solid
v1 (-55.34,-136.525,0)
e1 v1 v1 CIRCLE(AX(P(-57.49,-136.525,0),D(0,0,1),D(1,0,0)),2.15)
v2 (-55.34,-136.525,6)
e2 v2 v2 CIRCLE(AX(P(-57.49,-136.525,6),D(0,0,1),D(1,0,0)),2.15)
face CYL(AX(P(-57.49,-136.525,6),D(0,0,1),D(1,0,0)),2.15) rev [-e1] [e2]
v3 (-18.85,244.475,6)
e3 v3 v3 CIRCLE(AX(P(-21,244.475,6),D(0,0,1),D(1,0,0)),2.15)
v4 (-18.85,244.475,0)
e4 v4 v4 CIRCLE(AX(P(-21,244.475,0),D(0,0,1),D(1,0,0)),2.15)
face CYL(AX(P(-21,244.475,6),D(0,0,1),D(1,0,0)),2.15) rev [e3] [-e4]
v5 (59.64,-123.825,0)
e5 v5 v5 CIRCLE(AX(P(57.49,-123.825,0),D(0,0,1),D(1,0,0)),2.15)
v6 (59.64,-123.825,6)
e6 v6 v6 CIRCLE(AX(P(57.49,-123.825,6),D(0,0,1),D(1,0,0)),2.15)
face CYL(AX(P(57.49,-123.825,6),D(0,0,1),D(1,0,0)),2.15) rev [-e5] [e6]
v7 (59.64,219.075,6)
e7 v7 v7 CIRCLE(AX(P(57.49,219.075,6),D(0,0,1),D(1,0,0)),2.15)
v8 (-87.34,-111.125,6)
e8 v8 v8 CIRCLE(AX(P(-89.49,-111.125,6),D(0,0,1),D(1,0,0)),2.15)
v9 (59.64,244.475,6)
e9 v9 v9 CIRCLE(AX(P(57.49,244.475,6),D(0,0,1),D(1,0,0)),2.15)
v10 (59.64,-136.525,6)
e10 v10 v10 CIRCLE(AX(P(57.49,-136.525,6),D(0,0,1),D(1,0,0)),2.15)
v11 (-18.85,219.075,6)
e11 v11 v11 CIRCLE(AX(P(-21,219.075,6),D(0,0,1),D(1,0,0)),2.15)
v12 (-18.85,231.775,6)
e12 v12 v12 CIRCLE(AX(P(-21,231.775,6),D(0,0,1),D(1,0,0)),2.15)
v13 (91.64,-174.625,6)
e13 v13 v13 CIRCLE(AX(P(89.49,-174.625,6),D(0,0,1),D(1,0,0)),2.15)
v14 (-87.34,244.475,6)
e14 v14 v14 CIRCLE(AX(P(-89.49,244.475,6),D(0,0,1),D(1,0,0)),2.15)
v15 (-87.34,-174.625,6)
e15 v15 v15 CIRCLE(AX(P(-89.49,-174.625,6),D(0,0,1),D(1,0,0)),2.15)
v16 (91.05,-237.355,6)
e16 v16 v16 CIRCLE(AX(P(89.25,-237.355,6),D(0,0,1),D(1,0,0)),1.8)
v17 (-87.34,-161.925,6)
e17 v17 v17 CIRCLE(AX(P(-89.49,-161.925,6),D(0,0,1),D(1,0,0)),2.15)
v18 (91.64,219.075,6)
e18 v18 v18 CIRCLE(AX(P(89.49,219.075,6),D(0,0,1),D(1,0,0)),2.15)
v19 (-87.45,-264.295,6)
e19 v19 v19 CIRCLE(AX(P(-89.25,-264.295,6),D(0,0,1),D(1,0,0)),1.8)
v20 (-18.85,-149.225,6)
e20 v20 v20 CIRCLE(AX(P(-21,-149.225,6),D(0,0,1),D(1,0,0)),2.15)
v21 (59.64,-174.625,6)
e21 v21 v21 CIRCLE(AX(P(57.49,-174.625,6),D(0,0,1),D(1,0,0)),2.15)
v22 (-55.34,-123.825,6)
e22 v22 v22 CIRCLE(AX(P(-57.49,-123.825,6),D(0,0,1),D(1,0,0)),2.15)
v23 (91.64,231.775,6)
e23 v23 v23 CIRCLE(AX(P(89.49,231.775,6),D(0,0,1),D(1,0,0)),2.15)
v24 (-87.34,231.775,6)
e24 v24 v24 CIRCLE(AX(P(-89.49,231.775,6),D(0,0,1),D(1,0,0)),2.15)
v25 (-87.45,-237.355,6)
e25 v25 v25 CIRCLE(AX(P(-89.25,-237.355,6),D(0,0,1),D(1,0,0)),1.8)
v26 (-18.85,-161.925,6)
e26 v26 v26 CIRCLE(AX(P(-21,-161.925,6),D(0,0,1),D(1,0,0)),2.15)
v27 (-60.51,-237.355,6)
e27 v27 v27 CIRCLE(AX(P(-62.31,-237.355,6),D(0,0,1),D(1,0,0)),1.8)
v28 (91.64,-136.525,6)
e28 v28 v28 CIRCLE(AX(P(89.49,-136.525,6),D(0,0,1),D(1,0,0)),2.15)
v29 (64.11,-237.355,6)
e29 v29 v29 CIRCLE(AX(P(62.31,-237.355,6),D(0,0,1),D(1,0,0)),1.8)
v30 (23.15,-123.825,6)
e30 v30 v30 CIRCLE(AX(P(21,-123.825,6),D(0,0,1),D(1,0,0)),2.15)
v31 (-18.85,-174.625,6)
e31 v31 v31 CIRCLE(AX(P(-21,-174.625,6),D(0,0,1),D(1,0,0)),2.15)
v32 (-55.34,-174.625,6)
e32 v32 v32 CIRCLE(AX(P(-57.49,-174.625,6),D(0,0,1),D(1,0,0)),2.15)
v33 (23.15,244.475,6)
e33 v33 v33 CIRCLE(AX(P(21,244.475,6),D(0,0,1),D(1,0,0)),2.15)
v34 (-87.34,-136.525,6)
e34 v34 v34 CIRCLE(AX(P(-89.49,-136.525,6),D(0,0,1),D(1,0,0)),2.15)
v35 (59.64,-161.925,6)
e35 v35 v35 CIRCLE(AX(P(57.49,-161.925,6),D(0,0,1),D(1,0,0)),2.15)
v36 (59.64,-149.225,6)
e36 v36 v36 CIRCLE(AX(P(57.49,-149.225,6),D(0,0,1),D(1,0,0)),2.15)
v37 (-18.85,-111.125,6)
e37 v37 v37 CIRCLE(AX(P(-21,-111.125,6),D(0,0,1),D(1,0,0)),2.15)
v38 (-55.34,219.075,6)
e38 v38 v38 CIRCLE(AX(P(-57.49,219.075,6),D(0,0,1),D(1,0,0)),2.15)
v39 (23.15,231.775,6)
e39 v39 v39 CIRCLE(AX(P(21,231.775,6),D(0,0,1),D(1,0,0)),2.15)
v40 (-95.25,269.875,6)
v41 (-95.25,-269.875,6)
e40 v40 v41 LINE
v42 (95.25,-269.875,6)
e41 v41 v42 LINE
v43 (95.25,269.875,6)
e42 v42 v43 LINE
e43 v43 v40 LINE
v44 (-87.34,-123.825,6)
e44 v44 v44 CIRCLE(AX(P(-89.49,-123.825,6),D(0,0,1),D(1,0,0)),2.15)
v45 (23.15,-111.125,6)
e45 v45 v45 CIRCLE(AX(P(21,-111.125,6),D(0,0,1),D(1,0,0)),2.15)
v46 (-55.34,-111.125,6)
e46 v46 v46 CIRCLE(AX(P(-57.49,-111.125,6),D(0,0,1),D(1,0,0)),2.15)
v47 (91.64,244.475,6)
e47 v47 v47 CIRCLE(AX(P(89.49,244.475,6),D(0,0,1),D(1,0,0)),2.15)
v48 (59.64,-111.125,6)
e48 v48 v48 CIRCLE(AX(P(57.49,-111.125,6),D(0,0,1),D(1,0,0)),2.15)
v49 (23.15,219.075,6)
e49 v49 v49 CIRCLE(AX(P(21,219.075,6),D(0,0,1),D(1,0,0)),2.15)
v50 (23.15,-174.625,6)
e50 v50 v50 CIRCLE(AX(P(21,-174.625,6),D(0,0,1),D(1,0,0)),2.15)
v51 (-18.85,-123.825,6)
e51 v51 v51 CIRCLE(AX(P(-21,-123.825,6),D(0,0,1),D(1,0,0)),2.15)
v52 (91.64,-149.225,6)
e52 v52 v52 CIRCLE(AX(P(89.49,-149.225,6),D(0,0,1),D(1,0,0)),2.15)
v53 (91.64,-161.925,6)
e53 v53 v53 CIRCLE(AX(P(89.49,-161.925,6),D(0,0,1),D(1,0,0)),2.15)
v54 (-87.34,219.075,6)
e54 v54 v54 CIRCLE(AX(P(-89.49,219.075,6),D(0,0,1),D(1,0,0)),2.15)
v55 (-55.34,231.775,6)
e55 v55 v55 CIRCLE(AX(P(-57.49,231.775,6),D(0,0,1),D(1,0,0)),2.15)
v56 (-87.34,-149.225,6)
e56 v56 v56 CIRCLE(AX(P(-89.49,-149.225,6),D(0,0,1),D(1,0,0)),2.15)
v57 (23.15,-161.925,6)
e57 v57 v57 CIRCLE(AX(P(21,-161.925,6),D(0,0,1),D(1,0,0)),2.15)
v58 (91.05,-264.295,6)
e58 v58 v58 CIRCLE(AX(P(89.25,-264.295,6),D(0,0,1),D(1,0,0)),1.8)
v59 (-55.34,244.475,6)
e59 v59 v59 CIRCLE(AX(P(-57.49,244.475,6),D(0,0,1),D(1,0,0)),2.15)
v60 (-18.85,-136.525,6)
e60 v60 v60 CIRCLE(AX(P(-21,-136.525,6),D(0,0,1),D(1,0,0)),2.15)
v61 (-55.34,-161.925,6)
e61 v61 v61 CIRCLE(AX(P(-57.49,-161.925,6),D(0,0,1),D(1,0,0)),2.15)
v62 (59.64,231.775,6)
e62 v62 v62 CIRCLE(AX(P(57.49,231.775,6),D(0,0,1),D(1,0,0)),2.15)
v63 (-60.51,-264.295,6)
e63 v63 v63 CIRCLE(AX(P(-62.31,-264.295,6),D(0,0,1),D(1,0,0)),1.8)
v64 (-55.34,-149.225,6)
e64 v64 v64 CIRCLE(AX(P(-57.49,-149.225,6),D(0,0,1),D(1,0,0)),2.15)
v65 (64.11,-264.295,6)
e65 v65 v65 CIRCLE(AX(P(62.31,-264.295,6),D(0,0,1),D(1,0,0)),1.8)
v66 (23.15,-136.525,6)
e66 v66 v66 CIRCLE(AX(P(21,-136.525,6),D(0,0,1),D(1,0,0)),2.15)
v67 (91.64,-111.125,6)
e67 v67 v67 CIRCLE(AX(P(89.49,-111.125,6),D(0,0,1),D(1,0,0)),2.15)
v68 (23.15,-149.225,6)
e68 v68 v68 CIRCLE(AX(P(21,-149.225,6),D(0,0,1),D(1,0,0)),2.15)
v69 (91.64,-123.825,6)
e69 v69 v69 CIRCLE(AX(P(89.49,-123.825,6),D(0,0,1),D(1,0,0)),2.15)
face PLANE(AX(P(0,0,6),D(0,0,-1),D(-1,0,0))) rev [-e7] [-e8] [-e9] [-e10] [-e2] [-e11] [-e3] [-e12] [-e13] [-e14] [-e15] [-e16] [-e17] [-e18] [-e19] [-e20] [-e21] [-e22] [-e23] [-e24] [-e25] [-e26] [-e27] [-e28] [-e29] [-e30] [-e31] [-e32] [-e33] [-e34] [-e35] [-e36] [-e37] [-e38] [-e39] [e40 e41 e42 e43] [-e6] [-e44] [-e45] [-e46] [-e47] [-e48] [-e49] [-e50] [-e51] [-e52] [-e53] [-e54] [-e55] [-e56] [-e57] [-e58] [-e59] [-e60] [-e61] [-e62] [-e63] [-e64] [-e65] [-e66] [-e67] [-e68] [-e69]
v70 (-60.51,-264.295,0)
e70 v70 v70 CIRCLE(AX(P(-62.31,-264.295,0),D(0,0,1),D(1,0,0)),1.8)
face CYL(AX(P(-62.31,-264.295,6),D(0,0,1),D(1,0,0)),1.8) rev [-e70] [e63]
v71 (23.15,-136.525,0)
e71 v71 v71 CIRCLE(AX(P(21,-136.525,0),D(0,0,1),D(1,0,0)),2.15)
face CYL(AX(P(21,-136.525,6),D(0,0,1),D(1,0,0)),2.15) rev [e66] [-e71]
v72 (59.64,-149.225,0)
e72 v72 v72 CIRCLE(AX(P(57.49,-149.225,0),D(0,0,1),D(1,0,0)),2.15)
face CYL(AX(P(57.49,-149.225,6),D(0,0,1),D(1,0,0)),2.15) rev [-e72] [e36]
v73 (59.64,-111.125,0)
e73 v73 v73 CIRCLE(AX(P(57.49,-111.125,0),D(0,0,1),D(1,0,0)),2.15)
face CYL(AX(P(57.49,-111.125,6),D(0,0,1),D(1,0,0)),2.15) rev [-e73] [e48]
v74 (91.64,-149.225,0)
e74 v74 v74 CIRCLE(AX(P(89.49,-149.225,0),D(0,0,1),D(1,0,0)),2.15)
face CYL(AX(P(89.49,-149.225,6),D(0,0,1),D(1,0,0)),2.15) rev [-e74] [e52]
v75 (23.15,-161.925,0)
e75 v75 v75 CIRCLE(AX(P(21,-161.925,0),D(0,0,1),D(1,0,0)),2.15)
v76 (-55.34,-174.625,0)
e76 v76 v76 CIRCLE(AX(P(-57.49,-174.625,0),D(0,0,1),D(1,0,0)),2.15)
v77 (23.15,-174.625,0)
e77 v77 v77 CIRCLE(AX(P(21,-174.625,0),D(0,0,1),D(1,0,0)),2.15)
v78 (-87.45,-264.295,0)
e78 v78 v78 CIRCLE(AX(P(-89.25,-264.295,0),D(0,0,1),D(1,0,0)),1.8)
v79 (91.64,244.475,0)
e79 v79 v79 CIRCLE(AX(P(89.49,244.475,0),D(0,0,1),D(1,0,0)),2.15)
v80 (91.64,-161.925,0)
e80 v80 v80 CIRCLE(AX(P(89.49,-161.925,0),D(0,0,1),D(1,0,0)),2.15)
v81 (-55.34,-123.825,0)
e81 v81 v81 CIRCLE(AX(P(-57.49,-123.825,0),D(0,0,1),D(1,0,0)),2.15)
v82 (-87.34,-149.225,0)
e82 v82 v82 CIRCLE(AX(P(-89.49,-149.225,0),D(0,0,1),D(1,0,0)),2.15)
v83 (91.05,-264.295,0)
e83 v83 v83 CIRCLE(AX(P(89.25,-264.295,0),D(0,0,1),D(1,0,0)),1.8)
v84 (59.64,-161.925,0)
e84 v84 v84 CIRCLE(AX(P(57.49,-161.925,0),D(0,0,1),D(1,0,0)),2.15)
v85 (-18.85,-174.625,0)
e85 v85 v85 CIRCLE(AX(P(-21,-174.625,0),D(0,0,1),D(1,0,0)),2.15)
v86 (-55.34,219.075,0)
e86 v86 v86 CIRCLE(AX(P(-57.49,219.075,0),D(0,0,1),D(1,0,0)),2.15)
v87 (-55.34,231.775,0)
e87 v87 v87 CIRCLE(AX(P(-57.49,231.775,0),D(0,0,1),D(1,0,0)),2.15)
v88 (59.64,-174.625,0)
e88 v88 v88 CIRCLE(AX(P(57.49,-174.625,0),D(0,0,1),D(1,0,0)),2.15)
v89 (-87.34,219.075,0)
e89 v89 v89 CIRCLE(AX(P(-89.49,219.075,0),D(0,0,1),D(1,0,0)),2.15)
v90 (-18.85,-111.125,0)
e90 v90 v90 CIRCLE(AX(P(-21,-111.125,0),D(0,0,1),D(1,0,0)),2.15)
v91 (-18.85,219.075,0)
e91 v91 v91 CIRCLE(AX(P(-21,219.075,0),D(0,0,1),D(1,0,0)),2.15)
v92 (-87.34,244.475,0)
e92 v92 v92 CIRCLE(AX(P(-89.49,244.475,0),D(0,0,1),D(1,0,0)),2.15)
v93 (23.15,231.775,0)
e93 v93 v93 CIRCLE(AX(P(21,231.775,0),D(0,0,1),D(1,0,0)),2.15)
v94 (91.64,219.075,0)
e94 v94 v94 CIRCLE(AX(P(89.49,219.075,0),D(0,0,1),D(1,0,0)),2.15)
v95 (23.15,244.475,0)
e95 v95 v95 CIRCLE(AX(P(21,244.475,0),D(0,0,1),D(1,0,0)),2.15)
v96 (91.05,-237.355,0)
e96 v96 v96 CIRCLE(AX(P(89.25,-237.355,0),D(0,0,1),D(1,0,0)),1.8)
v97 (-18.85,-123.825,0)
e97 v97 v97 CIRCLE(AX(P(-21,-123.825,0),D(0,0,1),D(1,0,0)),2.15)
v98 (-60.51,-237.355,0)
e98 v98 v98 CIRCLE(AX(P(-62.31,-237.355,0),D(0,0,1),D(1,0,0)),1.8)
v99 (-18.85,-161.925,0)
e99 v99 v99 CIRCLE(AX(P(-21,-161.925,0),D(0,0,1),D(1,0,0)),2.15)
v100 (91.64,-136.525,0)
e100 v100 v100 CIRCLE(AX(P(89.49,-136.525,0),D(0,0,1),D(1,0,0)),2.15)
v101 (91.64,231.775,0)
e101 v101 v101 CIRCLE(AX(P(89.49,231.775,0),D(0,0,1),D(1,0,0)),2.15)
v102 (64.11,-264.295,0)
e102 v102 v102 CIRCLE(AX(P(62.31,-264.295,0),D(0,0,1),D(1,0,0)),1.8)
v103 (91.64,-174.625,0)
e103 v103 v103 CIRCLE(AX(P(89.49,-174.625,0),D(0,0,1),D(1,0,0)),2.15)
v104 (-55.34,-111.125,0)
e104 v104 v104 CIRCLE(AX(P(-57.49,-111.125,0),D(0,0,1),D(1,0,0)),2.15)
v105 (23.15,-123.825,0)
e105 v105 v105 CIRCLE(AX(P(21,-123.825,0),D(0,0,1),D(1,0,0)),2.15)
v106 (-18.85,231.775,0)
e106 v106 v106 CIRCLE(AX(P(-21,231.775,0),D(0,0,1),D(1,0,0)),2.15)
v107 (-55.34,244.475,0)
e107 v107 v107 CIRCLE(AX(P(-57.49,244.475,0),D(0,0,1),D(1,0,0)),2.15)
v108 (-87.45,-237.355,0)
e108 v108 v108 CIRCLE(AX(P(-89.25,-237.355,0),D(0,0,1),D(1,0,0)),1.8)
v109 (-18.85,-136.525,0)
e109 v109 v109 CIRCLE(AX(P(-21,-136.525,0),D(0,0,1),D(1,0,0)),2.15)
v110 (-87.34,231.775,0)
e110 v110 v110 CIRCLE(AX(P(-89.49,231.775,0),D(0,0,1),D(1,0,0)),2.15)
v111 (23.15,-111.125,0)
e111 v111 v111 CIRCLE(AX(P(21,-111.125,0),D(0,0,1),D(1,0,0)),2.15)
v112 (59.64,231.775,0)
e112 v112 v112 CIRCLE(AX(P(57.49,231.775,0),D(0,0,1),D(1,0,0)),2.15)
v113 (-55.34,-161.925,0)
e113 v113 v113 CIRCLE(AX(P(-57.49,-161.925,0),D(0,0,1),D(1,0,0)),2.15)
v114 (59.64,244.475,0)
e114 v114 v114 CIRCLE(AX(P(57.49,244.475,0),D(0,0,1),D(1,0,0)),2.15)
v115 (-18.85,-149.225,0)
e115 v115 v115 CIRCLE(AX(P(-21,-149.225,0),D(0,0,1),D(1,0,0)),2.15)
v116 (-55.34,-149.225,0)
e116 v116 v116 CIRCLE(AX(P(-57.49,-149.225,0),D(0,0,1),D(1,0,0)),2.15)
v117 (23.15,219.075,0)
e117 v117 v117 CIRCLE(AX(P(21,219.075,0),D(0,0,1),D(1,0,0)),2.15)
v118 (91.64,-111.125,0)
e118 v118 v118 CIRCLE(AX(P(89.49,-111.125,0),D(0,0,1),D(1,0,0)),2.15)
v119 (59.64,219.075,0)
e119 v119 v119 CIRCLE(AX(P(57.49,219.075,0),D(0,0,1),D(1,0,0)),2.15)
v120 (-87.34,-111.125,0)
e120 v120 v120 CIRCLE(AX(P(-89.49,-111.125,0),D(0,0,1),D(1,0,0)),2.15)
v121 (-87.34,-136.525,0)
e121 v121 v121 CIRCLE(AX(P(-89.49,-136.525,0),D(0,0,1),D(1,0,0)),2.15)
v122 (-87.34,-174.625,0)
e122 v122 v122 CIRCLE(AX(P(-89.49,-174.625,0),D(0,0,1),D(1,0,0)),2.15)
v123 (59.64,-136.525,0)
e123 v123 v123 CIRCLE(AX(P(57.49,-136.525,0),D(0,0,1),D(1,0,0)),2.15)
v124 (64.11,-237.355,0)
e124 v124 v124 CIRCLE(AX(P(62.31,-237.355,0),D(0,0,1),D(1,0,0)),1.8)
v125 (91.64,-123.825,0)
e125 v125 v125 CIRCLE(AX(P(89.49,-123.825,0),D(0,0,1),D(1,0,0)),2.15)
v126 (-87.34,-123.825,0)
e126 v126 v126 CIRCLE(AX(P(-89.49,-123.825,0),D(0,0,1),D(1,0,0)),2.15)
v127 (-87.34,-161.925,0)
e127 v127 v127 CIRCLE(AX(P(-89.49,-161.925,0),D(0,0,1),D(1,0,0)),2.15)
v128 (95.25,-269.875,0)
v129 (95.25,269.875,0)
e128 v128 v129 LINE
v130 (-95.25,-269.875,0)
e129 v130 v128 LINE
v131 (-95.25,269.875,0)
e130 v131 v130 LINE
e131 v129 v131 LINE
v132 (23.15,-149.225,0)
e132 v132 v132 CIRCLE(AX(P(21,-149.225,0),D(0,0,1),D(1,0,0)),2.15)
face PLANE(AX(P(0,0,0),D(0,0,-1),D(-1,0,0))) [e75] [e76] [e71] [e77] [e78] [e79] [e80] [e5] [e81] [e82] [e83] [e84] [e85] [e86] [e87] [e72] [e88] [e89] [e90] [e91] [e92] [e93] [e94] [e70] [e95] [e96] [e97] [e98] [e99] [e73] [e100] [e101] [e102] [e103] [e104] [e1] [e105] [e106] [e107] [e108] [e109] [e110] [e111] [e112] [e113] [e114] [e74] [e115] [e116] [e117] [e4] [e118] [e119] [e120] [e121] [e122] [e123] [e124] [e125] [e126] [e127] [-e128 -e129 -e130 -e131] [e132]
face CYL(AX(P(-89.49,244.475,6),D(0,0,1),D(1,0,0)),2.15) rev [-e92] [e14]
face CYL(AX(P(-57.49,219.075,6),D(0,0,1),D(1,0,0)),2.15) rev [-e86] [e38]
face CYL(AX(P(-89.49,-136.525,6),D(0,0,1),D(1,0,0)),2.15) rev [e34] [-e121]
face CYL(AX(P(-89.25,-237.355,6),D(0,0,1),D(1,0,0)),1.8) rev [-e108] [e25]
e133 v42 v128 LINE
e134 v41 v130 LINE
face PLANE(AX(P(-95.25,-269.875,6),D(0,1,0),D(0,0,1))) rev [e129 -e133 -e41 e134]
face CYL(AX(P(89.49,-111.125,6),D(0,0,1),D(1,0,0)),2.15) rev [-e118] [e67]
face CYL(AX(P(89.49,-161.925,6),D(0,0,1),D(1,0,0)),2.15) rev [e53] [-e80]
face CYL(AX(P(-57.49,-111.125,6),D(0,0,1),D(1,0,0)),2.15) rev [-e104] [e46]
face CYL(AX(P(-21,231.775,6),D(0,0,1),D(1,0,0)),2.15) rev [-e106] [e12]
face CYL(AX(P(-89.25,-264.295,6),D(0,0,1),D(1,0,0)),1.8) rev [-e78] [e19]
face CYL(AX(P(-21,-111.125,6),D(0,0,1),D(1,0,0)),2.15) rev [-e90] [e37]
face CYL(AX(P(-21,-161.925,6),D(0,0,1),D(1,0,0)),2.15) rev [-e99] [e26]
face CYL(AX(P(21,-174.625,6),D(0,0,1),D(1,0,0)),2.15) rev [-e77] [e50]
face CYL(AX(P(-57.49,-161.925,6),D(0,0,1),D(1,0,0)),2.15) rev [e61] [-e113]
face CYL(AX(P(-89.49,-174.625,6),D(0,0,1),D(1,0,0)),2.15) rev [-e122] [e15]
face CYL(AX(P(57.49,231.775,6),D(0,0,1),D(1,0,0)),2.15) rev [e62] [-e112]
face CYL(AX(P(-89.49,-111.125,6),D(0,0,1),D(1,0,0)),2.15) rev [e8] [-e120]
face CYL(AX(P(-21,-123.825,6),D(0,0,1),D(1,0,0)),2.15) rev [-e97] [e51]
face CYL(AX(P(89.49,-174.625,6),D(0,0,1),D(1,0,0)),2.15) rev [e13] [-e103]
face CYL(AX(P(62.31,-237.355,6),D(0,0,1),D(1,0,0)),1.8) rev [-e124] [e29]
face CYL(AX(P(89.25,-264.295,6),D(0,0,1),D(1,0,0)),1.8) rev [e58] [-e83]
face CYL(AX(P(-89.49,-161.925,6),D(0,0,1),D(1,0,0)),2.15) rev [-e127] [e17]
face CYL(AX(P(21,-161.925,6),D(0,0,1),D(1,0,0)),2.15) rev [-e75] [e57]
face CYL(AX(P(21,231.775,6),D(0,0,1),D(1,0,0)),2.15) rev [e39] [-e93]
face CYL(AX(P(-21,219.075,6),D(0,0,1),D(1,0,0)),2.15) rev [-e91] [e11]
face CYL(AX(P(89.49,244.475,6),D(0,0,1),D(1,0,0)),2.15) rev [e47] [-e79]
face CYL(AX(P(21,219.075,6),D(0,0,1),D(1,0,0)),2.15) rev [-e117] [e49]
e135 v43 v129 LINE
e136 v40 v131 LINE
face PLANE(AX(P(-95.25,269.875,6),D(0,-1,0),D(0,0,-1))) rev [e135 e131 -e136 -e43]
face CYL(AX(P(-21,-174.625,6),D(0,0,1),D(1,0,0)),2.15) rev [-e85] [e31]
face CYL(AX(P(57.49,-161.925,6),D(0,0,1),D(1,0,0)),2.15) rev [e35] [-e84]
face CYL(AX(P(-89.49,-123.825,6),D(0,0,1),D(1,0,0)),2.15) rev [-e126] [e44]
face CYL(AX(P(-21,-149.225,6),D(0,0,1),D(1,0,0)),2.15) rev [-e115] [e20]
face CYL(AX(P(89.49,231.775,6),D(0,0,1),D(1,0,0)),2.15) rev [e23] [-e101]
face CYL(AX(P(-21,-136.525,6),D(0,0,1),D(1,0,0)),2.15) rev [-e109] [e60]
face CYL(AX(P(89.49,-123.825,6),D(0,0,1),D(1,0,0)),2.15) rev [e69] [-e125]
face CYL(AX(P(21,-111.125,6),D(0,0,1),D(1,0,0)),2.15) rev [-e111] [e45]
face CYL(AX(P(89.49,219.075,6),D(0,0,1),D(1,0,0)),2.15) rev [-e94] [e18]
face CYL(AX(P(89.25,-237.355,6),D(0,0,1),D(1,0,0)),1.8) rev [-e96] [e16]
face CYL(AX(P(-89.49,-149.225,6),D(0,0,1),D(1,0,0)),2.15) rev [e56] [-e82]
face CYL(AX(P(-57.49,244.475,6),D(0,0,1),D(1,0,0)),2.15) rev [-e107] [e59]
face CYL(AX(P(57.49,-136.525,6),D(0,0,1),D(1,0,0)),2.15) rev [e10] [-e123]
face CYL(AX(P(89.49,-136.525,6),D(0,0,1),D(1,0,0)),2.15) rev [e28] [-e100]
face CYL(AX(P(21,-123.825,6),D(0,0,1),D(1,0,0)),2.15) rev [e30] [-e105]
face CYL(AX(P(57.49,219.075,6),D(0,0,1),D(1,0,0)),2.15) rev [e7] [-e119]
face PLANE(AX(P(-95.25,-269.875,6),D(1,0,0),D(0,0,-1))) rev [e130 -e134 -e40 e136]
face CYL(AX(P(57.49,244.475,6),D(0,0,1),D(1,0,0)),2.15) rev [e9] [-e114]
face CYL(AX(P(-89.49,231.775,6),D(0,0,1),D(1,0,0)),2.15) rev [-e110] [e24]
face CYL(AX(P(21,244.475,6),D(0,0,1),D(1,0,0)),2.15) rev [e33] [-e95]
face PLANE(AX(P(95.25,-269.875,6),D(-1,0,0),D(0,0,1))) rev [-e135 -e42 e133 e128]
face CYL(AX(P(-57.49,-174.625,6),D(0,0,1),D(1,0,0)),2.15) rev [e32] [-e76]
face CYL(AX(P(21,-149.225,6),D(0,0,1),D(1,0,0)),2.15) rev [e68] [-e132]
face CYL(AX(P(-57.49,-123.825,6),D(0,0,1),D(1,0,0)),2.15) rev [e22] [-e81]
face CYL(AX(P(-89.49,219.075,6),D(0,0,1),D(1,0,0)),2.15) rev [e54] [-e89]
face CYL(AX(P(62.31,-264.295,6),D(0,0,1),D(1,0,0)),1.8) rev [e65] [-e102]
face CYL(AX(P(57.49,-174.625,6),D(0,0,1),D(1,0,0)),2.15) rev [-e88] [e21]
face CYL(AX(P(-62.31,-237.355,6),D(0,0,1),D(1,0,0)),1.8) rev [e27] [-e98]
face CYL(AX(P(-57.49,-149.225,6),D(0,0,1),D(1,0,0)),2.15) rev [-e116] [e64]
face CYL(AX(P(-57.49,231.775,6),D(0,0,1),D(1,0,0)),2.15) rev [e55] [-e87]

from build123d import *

# Parameters (mm, degrees)
ESQUISSE1_W              = 190.5
ESQUISSE1_H              = 539.75
BOSS_EXTRU_1_DEPTH       = 6
D_GAGEMENT_M41_OUTLINE_R = 2.15
D_GAGEMENT_M41_DEPTH     = 6
D_GAGEMENT_M31_D         = 3.6
D_GAGEMENT_M31_DEPTH     = 6
D_GAGEMENT_M31_TIP       = 1.081549114


# Read off the part's stored shape, not the designer's step: Dégagement M41
with BuildPart() as part:
    # Esquisse1 → Boss.-Extru.1 (new body)
    with BuildSketch(Plane.XY):
        Rectangle(ESQUISSE1_W, ESQUISSE1_H)
    extrude(amount=BOSS_EXTRU_1_DEPTH)

    # Dégagement M41 outline → Dégagement M41 (cut)
    with BuildSketch(Plane.XY):
        with Locations((89.49, -174.625)):
            Circle(D_GAGEMENT_M41_OUTLINE_R)
        with Locations((57.49, -174.625)):
            Circle(D_GAGEMENT_M41_OUTLINE_R)
        with Locations((21, -174.625)):
            Circle(D_GAGEMENT_M41_OUTLINE_R)
        with Locations((-21, -174.625)):
            Circle(D_GAGEMENT_M41_OUTLINE_R)
        with Locations((-57.49, -174.625)):
            Circle(D_GAGEMENT_M41_OUTLINE_R)
        with Locations((-89.49, -174.625)):
            Circle(D_GAGEMENT_M41_OUTLINE_R)
        with Locations((89.49, -161.925)):
            Circle(D_GAGEMENT_M41_OUTLINE_R)
        with Locations((57.49, -161.925)):
            Circle(D_GAGEMENT_M41_OUTLINE_R)
        with Locations((21, -161.925)):
            Circle(D_GAGEMENT_M41_OUTLINE_R)
        with Locations((-21, -161.925)):
            Circle(D_GAGEMENT_M41_OUTLINE_R)
        with Locations((-57.49, -161.925)):
            Circle(D_GAGEMENT_M41_OUTLINE_R)
        with Locations((-89.49, -161.925)):
            Circle(D_GAGEMENT_M41_OUTLINE_R)
        with Locations((89.49, -149.225)):
            Circle(D_GAGEMENT_M41_OUTLINE_R)
        with Locations((57.49, -149.225)):
            Circle(D_GAGEMENT_M41_OUTLINE_R)
        with Locations((21, -149.225)):
            Circle(D_GAGEMENT_M41_OUTLINE_R)
        with Locations((-21, -149.225)):
            Circle(D_GAGEMENT_M41_OUTLINE_R)
        with Locations((-57.49, -149.225)):
            Circle(D_GAGEMENT_M41_OUTLINE_R)
        with Locations((-89.49, -149.225)):
            Circle(D_GAGEMENT_M41_OUTLINE_R)
        with Locations((89.49, -136.525)):
            Circle(D_GAGEMENT_M41_OUTLINE_R)
        with Locations((57.49, -136.525)):
            Circle(D_GAGEMENT_M41_OUTLINE_R)
        with Locations((21, -136.525)):
            Circle(D_GAGEMENT_M41_OUTLINE_R)
        with Locations((-21, -136.525)):
            Circle(D_GAGEMENT_M41_OUTLINE_R)
        with Locations((-57.49, -136.525)):
            Circle(D_GAGEMENT_M41_OUTLINE_R)
        with Locations((-89.49, -136.525)):
            Circle(D_GAGEMENT_M41_OUTLINE_R)
        with Locations((89.49, -123.825)):
            Circle(D_GAGEMENT_M41_OUTLINE_R)
        with Locations((57.49, -123.825)):
            Circle(D_GAGEMENT_M41_OUTLINE_R)
        with Locations((21, -123.825)):
            Circle(D_GAGEMENT_M41_OUTLINE_R)
        with Locations((-21, -123.825)):
            Circle(D_GAGEMENT_M41_OUTLINE_R)
        with Locations((-57.49, -123.825)):
            Circle(D_GAGEMENT_M41_OUTLINE_R)
        with Locations((-89.49, -123.825)):
            Circle(D_GAGEMENT_M41_OUTLINE_R)
        with Locations((89.49, -111.125)):
            Circle(D_GAGEMENT_M41_OUTLINE_R)
        with Locations((57.49, -111.125)):
            Circle(D_GAGEMENT_M41_OUTLINE_R)
        with Locations((21, -111.125)):
            Circle(D_GAGEMENT_M41_OUTLINE_R)
        with Locations((-21, -111.125)):
            Circle(D_GAGEMENT_M41_OUTLINE_R)
        with Locations((-57.49, -111.125)):
            Circle(D_GAGEMENT_M41_OUTLINE_R)
        with Locations((-89.49, -111.125)):
            Circle(D_GAGEMENT_M41_OUTLINE_R)
        with Locations((89.49, 219.075)):
            Circle(D_GAGEMENT_M41_OUTLINE_R)
        with Locations((57.49, 219.075)):
            Circle(D_GAGEMENT_M41_OUTLINE_R)
        with Locations((21, 219.075)):
            Circle(D_GAGEMENT_M41_OUTLINE_R)
        with Locations((-21, 219.075)):
            Circle(D_GAGEMENT_M41_OUTLINE_R)
        with Locations((-57.49, 219.075)):
            Circle(D_GAGEMENT_M41_OUTLINE_R)
        with Locations((-89.49, 219.075)):
            Circle(D_GAGEMENT_M41_OUTLINE_R)
        with Locations((89.49, 231.775)):
            Circle(D_GAGEMENT_M41_OUTLINE_R)
        with Locations((57.49, 231.775)):
            Circle(D_GAGEMENT_M41_OUTLINE_R)
        with Locations((21, 231.775)):
            Circle(D_GAGEMENT_M41_OUTLINE_R)
        with Locations((-21, 231.775)):
            Circle(D_GAGEMENT_M41_OUTLINE_R)
        with Locations((-57.49, 231.775)):
            Circle(D_GAGEMENT_M41_OUTLINE_R)
        with Locations((-89.49, 231.775)):
            Circle(D_GAGEMENT_M41_OUTLINE_R)
        with Locations((89.49, 244.475)):
            Circle(D_GAGEMENT_M41_OUTLINE_R)
        with Locations((57.49, 244.475)):
            Circle(D_GAGEMENT_M41_OUTLINE_R)
        with Locations((21, 244.475)):
            Circle(D_GAGEMENT_M41_OUTLINE_R)
        with Locations((-21, 244.475)):
            Circle(D_GAGEMENT_M41_OUTLINE_R)
        with Locations((-57.49, 244.475)):
            Circle(D_GAGEMENT_M41_OUTLINE_R)
        with Locations((-89.49, 244.475)):
            Circle(D_GAGEMENT_M41_OUTLINE_R)
    extrude(amount=D_GAGEMENT_M41_DEPTH, mode=Mode.SUBTRACT)

    # Dégagement M31
    with Locations(Plane(origin=(-89.25, -237.355, 6), x_dir=(1, 0, 0), z_dir=(0, 0, 1))):
        with Locations((0, 0), (26.94, 0), (0, -26.94), (26.94, -26.94), (151.56, 0), (178.5, 0), (151.56, -26.94), (178.5, -26.94)):
            Hole(D_GAGEMENT_M31_D / 2, depth=D_GAGEMENT_M31_DEPTH)
            with Locations((0, 0, -(D_GAGEMENT_M31_DEPTH + D_GAGEMENT_M31_TIP / 2))):  # 118° drill point
                Cone(0, D_GAGEMENT_M31_D / 2, D_GAGEMENT_M31_TIP, mode=Mode.SUBTRACT)


solid = part.part
